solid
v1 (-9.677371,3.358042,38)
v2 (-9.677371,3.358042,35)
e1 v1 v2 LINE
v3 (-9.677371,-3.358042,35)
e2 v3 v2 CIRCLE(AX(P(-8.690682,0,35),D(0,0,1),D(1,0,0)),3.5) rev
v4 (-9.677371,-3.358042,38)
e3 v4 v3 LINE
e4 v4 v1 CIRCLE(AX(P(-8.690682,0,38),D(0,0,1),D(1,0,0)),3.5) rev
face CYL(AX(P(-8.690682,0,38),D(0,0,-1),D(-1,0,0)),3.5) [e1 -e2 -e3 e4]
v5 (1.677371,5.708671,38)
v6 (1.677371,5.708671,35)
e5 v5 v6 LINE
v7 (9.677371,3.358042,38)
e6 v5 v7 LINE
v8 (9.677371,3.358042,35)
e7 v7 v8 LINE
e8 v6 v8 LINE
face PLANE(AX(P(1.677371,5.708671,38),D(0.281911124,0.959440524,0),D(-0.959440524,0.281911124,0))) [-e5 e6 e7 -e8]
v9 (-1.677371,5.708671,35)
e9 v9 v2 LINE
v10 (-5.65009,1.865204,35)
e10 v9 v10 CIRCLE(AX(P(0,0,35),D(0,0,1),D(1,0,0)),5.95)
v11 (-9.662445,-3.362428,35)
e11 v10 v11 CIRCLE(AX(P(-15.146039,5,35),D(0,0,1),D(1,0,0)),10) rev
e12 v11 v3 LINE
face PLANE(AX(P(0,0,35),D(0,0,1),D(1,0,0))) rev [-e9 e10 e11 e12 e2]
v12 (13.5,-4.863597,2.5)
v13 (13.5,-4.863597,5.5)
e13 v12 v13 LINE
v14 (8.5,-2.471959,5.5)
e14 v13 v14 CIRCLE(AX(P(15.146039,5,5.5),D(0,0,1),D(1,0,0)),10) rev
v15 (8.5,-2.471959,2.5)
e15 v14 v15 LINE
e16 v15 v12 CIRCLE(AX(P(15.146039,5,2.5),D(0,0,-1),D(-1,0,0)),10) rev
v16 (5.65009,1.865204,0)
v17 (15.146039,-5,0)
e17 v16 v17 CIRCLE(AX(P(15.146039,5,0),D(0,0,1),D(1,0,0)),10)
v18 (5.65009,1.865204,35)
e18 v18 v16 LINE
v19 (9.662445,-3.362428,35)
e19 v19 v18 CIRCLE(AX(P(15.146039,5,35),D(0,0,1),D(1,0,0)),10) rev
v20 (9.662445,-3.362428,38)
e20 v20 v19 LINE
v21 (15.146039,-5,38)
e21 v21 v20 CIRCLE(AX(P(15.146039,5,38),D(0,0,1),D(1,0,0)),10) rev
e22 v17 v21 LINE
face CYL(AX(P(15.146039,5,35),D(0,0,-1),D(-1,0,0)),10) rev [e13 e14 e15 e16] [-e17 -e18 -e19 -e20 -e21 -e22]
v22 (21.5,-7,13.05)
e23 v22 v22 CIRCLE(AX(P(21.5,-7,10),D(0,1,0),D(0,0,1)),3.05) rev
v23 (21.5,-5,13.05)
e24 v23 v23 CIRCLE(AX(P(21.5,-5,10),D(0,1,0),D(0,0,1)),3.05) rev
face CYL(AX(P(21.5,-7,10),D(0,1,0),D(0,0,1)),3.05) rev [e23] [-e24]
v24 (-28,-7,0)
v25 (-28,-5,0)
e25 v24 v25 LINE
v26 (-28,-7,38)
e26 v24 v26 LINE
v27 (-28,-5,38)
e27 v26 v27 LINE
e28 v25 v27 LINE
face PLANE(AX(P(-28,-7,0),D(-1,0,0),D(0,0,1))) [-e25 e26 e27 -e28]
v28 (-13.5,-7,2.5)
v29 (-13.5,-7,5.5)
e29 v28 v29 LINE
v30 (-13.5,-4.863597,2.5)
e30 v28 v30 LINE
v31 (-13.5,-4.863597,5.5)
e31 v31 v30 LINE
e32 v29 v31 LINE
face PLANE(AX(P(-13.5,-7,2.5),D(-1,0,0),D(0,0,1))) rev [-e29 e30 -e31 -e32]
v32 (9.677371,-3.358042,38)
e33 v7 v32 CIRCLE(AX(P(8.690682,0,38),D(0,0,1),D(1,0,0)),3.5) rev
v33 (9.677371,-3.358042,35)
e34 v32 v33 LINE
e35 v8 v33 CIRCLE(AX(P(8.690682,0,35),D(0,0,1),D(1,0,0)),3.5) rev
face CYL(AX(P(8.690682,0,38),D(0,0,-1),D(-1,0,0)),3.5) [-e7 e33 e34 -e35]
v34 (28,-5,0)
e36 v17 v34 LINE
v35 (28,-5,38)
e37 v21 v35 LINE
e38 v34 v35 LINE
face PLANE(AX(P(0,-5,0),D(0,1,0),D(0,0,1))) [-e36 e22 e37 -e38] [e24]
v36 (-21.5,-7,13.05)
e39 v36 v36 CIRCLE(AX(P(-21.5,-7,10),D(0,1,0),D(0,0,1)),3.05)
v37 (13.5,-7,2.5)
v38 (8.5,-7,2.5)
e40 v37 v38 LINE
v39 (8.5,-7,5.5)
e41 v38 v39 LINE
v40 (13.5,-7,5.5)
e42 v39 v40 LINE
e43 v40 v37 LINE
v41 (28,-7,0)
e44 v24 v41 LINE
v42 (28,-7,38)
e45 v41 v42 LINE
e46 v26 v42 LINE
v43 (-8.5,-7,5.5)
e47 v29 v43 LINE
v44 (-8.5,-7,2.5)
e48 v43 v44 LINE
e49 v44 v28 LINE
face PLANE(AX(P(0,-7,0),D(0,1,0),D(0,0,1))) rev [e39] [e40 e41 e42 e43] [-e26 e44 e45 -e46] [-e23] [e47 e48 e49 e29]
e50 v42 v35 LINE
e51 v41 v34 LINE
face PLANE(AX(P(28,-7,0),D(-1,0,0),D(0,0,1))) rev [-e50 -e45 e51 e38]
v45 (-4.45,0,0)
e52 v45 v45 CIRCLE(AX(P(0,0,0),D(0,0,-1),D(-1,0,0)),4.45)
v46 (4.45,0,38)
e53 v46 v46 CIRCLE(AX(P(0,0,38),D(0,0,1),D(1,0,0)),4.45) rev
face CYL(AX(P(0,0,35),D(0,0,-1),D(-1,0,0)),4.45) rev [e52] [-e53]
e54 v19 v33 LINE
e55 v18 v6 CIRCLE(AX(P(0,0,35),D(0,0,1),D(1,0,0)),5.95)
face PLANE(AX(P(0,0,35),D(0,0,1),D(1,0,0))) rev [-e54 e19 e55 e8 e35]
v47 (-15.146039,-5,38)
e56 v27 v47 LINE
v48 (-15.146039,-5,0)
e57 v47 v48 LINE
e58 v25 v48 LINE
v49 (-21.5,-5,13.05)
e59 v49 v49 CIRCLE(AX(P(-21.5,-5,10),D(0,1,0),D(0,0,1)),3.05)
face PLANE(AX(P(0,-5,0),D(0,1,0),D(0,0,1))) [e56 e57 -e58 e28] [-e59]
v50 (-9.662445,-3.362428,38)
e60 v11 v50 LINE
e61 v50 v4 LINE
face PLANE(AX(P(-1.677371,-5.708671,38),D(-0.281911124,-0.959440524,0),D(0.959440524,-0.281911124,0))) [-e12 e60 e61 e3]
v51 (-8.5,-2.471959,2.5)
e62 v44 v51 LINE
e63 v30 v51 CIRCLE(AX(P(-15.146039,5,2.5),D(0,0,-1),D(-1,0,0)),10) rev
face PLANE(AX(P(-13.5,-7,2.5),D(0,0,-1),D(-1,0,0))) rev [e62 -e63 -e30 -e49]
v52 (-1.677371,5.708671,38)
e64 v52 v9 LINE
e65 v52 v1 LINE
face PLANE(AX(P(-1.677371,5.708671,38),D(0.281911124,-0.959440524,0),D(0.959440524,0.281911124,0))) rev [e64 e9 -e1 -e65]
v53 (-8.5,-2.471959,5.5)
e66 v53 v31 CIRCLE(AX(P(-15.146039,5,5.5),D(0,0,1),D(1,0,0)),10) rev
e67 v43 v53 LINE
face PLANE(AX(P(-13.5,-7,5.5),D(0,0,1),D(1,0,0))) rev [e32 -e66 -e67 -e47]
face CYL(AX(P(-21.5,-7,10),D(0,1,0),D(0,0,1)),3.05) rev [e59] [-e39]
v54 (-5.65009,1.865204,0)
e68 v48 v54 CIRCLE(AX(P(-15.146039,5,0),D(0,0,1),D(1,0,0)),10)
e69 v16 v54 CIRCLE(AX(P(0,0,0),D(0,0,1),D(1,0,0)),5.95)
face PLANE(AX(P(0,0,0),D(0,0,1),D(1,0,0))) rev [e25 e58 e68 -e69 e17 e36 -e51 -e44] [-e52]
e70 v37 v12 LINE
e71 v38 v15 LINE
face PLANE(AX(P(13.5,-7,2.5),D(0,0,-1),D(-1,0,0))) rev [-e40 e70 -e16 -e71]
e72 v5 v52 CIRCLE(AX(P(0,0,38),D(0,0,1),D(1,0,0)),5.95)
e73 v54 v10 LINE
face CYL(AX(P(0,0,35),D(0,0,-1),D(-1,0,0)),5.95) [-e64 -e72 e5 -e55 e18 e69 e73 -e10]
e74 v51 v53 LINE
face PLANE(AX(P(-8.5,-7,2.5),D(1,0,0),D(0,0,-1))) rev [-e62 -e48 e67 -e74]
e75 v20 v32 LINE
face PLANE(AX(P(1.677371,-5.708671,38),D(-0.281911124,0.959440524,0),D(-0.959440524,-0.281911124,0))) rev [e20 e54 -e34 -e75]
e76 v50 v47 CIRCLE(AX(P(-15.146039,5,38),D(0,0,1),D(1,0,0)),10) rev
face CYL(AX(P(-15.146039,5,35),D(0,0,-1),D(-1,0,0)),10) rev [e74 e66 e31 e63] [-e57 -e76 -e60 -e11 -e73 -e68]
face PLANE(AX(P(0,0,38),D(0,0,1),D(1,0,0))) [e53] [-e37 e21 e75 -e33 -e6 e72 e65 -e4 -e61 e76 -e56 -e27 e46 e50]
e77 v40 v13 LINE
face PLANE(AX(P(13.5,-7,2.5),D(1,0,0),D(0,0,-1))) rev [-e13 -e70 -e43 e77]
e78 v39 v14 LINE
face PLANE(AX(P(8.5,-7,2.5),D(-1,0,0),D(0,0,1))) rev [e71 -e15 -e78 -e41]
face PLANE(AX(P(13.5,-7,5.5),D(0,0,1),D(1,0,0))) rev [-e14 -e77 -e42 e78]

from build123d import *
from build123d.topology import SkipClean

# Parameters (mm, degrees)
ESQUISSE1_R                  = 4.45
BOSS_EXTRU_1_DEPTH           = 1.5
ESQUISSE1_2_R                = 5.95
ESQUISSE1_2_R_2              = 4.45
EXTRU_MINCE1_DEPTH           = 35
ESQUISSE2_R                  = 5.95
ESQUISSE2_R_2                = 4.45
BOSS_EXTRU_2_DEPTH           = 3
ESQUISSE4_W                  = 28
ESQUISSE4_H                  = 38
ESQUISSE4_R                  = 3.05
BOSS_EXTRU_3_DEPTH           = 2
CONG_1_R                     = 10
ESQUISSE5_R                  = 4.45
ENL_V_MAT_EXTRU_1_DEPTH      = 10
ENL_V_MAT_EXTRU_4_DEPTH      = 49.455159684
ENL_V_MAT_EXTRU_4_DEPTH_BACK = 49.455159684
ESQUISSE8_W                  = 5
ESQUISSE8_H                  = 3


with BuildPart() as part:
    # Esquisse1 → Boss.-Extru.1 (new body)
    with BuildSketch(Plane.XY):
        Circle(ESQUISSE1_R)
    extrude(amount=BOSS_EXTRU_1_DEPTH)

    # Esquisse1<2> → Extru.-Mince1 (add)
    with BuildSketch(Plane.XY):
        Circle(ESQUISSE1_2_R)
        Circle(ESQUISSE1_2_R_2, mode=Mode.SUBTRACT)
    extrude(amount=EXTRU_MINCE1_DEPTH)

    # Esquisse2 → Boss.-Extru.2 (add)
    # profile 1 of 3: a face of its own
    with BuildSketch(Plane.XY.offset(35)):
        with BuildLine():
            Line((9.677371186, 3.358041833), (1.677371186, 5.708671115))
            ThreePointArc((1.677371186, 5.708671115), (4.76355217, 3.565258858), (5.95, 0))
            ThreePointArc((5.95, 0), (4.76355217, -3.565258858), (1.677371186, -5.708671115))
            Line((1.677371186, -5.708671115), (9.677371186, -3.358041833))
            ThreePointArc((9.677371186, -3.358041833), (11.492771765, -2.097211093), (12.190682253, 0))
            ThreePointArc((12.190682253, 0), (11.492771765, 2.097211093), (9.677371186, 3.358041833))
        make_face()
    # profile 2 of 3: a face of its own
    with BuildSketch(Plane.XY.offset(35)):
        with BuildLine():
            ThreePointArc((-1.677371186, -5.708671115), (-5.95, 0), (-1.677371186, 5.708671115))
            Line((-1.677371186, 5.708671115), (-9.677371186, 3.358041833))
            ThreePointArc((-9.677371186, 3.358041833), (-11.492771765, 2.097211093), (-12.190682253, 0))
            ThreePointArc((-12.190682253, 0), (-11.492771765, -2.097211093), (-9.677371186, -3.358041833))
            Line((-9.677371186, -3.358041833), (-1.677371186, -5.708671115))
        make_face()
    # profile 3 of 3: a face of its own
    with BuildSketch(Plane.XY.offset(35)):
        with Locations(Location((0, 0, 0), (0, 0, 106.374299713))):
            Circle(ESQUISSE2_R)
        Circle(ESQUISSE2_R_2, mode=Mode.SUBTRACT)
    extrude(amount=BOSS_EXTRU_2_DEPTH)

    # Esquisse4 → Boss.-Extru.3 (add)
    # profile 1 of 4: a face of its own
    with BuildSketch(Plane(origin=(0, -5, 0), x_dir=(1, 0, 0), z_dir=(0, 1, 0))):
        with Locations((14, -19)):
            Rectangle(ESQUISSE4_W, ESQUISSE4_H)
        with Locations(Location((21.5, -10, 0), (0, 0, 270))):
            Circle(ESQUISSE4_R, mode=Mode.SUBTRACT)
    # profile 2 of 4: a face of its own
    with BuildSketch(Plane(origin=(0, -5, 0), x_dir=(1, 0, 0), z_dir=(0, 1, 0))):
        with Locations((-14, -19)):
            Rectangle(ESQUISSE4_W, ESQUISSE4_H)
        with Locations(Location((-21.5, -10, 0), (0, 0, 270))):
            Circle(ESQUISSE4_R, mode=Mode.SUBTRACT)
    # profile 3 of 4: a face of its own
    with BuildSketch(Plane(origin=(0, -5, 0), x_dir=(1, 0, 0), z_dir=(0, 1, 0))):
        with Locations((-14, -19)):
            Rectangle(ESQUISSE4_W, ESQUISSE4_H)
        with Locations(Location((-21.5, -10, 0), (0, 0, 270))):
            Circle(ESQUISSE4_R, mode=Mode.SUBTRACT)
    # profile 4 of 4: a face of its own
    with BuildSketch(Plane(origin=(0, -5, 0), x_dir=(1, 0, 0), z_dir=(0, 1, 0))):
        with Locations((14, -19)):
            Rectangle(ESQUISSE4_W, ESQUISSE4_H)
        with Locations(Location((21.5, -10, 0), (0, 0, 270))):
            Circle(ESQUISSE4_R, mode=Mode.SUBTRACT)
    extrude(amount=-BOSS_EXTRU_3_DEPTH)

    # Congé1
    # the kernel refuses this fillet: 10 mm, written as the material it adds along each edge
    with BuildSketch(Plane(origin=(-3.225290685, -5, 64.801871004), x_dir=(-0.33303824301553137, 0.9429133198174304, 0), z_dir=(0, 0, -1))) as cong_1_piece_1_section:
        with BuildLine():
            CenterArc((13.399198301, -7.90985002), CONG_1_R, 127.722343038, 71.730945551)
            Line((3.970065103, -11.24023245), (0, 0))
            ThreePointArc((0, 0), (3.640421456, -1.243639238), (7.280842913, 0))
        make_face()
    cong_1_piece_1 = extrude(amount=64.801871004, mode=Mode.PRIVATE)
    cong_1_piece_1 = split(cong_1_piece_1, bisect_by=Plane(origin=(-7.500746377, -3.487839575, 38), z_dir=(0, 0, -1)), keep=Keep.TOP, mode=Mode.PRIVATE)
    add(cong_1_piece_1)
    with BuildSketch(Plane(origin=(3.225290685, -5, 64.801871004), x_dir=(0.3330382430155311, 0.9429133198174307, 0), z_dir=(0, 0, -1))) as cong_1_piece_2_section:
        with BuildLine():
            CenterArc((13.399198301, 7.90985002), CONG_1_R, 160.546711411, 71.730945551)
            Line((3.970065103, 11.24023245), (0, 0))
            ThreePointArc((0, 0), (3.640421456, 1.243639238), (7.280842913, 0))
        make_face()
    cong_1_piece_2 = extrude(amount=64.801871004, mode=Mode.PRIVATE)
    cong_1_piece_2 = split(cong_1_piece_2, bisect_by=Plane(origin=(7.500746377, -3.487839575, 38), z_dir=(0, 0, -1)), keep=Keep.TOP, mode=Mode.PRIVATE)
    add(cong_1_piece_2)

    # Esquisse5 → Enlèv. mat.-Extru.1 (cut)
    with SkipClean():  # the faces are left unmerged after this step: merging them gives an invalid solid
        with BuildSketch(Plane(origin=(0, 0, 0), x_dir=(-1, 0, 0), z_dir=(0, 0, -1))):
            Circle(ESQUISSE5_R)
        extrude(amount=-ENL_V_MAT_EXTRU_1_DEPTH, mode=Mode.SUBTRACT)
    add(part.part.scale(1), mode=Mode.REPLACE)  # the faces are merged on a copy

    # Esquisse8 → Enlèv. mat.-Extru.4 (cut, two sides: drawn at the far end of the back side and taken through both)
    with BuildSketch(Plane(origin=(0, -5, 0), x_dir=(1, 0, 0), z_dir=(0, 1, 0)).offset(-ENL_V_MAT_EXTRU_4_DEPTH_BACK)):
        with Locations((-11, -4)):
            Rectangle(ESQUISSE8_W, ESQUISSE8_H)
        with Locations((11, -4)):
            Rectangle(ESQUISSE8_W, ESQUISSE8_H)
    extrude(amount=ENL_V_MAT_EXTRU_4_DEPTH + ENL_V_MAT_EXTRU_4_DEPTH_BACK, mode=Mode.SUBTRACT)


solid = part.part
